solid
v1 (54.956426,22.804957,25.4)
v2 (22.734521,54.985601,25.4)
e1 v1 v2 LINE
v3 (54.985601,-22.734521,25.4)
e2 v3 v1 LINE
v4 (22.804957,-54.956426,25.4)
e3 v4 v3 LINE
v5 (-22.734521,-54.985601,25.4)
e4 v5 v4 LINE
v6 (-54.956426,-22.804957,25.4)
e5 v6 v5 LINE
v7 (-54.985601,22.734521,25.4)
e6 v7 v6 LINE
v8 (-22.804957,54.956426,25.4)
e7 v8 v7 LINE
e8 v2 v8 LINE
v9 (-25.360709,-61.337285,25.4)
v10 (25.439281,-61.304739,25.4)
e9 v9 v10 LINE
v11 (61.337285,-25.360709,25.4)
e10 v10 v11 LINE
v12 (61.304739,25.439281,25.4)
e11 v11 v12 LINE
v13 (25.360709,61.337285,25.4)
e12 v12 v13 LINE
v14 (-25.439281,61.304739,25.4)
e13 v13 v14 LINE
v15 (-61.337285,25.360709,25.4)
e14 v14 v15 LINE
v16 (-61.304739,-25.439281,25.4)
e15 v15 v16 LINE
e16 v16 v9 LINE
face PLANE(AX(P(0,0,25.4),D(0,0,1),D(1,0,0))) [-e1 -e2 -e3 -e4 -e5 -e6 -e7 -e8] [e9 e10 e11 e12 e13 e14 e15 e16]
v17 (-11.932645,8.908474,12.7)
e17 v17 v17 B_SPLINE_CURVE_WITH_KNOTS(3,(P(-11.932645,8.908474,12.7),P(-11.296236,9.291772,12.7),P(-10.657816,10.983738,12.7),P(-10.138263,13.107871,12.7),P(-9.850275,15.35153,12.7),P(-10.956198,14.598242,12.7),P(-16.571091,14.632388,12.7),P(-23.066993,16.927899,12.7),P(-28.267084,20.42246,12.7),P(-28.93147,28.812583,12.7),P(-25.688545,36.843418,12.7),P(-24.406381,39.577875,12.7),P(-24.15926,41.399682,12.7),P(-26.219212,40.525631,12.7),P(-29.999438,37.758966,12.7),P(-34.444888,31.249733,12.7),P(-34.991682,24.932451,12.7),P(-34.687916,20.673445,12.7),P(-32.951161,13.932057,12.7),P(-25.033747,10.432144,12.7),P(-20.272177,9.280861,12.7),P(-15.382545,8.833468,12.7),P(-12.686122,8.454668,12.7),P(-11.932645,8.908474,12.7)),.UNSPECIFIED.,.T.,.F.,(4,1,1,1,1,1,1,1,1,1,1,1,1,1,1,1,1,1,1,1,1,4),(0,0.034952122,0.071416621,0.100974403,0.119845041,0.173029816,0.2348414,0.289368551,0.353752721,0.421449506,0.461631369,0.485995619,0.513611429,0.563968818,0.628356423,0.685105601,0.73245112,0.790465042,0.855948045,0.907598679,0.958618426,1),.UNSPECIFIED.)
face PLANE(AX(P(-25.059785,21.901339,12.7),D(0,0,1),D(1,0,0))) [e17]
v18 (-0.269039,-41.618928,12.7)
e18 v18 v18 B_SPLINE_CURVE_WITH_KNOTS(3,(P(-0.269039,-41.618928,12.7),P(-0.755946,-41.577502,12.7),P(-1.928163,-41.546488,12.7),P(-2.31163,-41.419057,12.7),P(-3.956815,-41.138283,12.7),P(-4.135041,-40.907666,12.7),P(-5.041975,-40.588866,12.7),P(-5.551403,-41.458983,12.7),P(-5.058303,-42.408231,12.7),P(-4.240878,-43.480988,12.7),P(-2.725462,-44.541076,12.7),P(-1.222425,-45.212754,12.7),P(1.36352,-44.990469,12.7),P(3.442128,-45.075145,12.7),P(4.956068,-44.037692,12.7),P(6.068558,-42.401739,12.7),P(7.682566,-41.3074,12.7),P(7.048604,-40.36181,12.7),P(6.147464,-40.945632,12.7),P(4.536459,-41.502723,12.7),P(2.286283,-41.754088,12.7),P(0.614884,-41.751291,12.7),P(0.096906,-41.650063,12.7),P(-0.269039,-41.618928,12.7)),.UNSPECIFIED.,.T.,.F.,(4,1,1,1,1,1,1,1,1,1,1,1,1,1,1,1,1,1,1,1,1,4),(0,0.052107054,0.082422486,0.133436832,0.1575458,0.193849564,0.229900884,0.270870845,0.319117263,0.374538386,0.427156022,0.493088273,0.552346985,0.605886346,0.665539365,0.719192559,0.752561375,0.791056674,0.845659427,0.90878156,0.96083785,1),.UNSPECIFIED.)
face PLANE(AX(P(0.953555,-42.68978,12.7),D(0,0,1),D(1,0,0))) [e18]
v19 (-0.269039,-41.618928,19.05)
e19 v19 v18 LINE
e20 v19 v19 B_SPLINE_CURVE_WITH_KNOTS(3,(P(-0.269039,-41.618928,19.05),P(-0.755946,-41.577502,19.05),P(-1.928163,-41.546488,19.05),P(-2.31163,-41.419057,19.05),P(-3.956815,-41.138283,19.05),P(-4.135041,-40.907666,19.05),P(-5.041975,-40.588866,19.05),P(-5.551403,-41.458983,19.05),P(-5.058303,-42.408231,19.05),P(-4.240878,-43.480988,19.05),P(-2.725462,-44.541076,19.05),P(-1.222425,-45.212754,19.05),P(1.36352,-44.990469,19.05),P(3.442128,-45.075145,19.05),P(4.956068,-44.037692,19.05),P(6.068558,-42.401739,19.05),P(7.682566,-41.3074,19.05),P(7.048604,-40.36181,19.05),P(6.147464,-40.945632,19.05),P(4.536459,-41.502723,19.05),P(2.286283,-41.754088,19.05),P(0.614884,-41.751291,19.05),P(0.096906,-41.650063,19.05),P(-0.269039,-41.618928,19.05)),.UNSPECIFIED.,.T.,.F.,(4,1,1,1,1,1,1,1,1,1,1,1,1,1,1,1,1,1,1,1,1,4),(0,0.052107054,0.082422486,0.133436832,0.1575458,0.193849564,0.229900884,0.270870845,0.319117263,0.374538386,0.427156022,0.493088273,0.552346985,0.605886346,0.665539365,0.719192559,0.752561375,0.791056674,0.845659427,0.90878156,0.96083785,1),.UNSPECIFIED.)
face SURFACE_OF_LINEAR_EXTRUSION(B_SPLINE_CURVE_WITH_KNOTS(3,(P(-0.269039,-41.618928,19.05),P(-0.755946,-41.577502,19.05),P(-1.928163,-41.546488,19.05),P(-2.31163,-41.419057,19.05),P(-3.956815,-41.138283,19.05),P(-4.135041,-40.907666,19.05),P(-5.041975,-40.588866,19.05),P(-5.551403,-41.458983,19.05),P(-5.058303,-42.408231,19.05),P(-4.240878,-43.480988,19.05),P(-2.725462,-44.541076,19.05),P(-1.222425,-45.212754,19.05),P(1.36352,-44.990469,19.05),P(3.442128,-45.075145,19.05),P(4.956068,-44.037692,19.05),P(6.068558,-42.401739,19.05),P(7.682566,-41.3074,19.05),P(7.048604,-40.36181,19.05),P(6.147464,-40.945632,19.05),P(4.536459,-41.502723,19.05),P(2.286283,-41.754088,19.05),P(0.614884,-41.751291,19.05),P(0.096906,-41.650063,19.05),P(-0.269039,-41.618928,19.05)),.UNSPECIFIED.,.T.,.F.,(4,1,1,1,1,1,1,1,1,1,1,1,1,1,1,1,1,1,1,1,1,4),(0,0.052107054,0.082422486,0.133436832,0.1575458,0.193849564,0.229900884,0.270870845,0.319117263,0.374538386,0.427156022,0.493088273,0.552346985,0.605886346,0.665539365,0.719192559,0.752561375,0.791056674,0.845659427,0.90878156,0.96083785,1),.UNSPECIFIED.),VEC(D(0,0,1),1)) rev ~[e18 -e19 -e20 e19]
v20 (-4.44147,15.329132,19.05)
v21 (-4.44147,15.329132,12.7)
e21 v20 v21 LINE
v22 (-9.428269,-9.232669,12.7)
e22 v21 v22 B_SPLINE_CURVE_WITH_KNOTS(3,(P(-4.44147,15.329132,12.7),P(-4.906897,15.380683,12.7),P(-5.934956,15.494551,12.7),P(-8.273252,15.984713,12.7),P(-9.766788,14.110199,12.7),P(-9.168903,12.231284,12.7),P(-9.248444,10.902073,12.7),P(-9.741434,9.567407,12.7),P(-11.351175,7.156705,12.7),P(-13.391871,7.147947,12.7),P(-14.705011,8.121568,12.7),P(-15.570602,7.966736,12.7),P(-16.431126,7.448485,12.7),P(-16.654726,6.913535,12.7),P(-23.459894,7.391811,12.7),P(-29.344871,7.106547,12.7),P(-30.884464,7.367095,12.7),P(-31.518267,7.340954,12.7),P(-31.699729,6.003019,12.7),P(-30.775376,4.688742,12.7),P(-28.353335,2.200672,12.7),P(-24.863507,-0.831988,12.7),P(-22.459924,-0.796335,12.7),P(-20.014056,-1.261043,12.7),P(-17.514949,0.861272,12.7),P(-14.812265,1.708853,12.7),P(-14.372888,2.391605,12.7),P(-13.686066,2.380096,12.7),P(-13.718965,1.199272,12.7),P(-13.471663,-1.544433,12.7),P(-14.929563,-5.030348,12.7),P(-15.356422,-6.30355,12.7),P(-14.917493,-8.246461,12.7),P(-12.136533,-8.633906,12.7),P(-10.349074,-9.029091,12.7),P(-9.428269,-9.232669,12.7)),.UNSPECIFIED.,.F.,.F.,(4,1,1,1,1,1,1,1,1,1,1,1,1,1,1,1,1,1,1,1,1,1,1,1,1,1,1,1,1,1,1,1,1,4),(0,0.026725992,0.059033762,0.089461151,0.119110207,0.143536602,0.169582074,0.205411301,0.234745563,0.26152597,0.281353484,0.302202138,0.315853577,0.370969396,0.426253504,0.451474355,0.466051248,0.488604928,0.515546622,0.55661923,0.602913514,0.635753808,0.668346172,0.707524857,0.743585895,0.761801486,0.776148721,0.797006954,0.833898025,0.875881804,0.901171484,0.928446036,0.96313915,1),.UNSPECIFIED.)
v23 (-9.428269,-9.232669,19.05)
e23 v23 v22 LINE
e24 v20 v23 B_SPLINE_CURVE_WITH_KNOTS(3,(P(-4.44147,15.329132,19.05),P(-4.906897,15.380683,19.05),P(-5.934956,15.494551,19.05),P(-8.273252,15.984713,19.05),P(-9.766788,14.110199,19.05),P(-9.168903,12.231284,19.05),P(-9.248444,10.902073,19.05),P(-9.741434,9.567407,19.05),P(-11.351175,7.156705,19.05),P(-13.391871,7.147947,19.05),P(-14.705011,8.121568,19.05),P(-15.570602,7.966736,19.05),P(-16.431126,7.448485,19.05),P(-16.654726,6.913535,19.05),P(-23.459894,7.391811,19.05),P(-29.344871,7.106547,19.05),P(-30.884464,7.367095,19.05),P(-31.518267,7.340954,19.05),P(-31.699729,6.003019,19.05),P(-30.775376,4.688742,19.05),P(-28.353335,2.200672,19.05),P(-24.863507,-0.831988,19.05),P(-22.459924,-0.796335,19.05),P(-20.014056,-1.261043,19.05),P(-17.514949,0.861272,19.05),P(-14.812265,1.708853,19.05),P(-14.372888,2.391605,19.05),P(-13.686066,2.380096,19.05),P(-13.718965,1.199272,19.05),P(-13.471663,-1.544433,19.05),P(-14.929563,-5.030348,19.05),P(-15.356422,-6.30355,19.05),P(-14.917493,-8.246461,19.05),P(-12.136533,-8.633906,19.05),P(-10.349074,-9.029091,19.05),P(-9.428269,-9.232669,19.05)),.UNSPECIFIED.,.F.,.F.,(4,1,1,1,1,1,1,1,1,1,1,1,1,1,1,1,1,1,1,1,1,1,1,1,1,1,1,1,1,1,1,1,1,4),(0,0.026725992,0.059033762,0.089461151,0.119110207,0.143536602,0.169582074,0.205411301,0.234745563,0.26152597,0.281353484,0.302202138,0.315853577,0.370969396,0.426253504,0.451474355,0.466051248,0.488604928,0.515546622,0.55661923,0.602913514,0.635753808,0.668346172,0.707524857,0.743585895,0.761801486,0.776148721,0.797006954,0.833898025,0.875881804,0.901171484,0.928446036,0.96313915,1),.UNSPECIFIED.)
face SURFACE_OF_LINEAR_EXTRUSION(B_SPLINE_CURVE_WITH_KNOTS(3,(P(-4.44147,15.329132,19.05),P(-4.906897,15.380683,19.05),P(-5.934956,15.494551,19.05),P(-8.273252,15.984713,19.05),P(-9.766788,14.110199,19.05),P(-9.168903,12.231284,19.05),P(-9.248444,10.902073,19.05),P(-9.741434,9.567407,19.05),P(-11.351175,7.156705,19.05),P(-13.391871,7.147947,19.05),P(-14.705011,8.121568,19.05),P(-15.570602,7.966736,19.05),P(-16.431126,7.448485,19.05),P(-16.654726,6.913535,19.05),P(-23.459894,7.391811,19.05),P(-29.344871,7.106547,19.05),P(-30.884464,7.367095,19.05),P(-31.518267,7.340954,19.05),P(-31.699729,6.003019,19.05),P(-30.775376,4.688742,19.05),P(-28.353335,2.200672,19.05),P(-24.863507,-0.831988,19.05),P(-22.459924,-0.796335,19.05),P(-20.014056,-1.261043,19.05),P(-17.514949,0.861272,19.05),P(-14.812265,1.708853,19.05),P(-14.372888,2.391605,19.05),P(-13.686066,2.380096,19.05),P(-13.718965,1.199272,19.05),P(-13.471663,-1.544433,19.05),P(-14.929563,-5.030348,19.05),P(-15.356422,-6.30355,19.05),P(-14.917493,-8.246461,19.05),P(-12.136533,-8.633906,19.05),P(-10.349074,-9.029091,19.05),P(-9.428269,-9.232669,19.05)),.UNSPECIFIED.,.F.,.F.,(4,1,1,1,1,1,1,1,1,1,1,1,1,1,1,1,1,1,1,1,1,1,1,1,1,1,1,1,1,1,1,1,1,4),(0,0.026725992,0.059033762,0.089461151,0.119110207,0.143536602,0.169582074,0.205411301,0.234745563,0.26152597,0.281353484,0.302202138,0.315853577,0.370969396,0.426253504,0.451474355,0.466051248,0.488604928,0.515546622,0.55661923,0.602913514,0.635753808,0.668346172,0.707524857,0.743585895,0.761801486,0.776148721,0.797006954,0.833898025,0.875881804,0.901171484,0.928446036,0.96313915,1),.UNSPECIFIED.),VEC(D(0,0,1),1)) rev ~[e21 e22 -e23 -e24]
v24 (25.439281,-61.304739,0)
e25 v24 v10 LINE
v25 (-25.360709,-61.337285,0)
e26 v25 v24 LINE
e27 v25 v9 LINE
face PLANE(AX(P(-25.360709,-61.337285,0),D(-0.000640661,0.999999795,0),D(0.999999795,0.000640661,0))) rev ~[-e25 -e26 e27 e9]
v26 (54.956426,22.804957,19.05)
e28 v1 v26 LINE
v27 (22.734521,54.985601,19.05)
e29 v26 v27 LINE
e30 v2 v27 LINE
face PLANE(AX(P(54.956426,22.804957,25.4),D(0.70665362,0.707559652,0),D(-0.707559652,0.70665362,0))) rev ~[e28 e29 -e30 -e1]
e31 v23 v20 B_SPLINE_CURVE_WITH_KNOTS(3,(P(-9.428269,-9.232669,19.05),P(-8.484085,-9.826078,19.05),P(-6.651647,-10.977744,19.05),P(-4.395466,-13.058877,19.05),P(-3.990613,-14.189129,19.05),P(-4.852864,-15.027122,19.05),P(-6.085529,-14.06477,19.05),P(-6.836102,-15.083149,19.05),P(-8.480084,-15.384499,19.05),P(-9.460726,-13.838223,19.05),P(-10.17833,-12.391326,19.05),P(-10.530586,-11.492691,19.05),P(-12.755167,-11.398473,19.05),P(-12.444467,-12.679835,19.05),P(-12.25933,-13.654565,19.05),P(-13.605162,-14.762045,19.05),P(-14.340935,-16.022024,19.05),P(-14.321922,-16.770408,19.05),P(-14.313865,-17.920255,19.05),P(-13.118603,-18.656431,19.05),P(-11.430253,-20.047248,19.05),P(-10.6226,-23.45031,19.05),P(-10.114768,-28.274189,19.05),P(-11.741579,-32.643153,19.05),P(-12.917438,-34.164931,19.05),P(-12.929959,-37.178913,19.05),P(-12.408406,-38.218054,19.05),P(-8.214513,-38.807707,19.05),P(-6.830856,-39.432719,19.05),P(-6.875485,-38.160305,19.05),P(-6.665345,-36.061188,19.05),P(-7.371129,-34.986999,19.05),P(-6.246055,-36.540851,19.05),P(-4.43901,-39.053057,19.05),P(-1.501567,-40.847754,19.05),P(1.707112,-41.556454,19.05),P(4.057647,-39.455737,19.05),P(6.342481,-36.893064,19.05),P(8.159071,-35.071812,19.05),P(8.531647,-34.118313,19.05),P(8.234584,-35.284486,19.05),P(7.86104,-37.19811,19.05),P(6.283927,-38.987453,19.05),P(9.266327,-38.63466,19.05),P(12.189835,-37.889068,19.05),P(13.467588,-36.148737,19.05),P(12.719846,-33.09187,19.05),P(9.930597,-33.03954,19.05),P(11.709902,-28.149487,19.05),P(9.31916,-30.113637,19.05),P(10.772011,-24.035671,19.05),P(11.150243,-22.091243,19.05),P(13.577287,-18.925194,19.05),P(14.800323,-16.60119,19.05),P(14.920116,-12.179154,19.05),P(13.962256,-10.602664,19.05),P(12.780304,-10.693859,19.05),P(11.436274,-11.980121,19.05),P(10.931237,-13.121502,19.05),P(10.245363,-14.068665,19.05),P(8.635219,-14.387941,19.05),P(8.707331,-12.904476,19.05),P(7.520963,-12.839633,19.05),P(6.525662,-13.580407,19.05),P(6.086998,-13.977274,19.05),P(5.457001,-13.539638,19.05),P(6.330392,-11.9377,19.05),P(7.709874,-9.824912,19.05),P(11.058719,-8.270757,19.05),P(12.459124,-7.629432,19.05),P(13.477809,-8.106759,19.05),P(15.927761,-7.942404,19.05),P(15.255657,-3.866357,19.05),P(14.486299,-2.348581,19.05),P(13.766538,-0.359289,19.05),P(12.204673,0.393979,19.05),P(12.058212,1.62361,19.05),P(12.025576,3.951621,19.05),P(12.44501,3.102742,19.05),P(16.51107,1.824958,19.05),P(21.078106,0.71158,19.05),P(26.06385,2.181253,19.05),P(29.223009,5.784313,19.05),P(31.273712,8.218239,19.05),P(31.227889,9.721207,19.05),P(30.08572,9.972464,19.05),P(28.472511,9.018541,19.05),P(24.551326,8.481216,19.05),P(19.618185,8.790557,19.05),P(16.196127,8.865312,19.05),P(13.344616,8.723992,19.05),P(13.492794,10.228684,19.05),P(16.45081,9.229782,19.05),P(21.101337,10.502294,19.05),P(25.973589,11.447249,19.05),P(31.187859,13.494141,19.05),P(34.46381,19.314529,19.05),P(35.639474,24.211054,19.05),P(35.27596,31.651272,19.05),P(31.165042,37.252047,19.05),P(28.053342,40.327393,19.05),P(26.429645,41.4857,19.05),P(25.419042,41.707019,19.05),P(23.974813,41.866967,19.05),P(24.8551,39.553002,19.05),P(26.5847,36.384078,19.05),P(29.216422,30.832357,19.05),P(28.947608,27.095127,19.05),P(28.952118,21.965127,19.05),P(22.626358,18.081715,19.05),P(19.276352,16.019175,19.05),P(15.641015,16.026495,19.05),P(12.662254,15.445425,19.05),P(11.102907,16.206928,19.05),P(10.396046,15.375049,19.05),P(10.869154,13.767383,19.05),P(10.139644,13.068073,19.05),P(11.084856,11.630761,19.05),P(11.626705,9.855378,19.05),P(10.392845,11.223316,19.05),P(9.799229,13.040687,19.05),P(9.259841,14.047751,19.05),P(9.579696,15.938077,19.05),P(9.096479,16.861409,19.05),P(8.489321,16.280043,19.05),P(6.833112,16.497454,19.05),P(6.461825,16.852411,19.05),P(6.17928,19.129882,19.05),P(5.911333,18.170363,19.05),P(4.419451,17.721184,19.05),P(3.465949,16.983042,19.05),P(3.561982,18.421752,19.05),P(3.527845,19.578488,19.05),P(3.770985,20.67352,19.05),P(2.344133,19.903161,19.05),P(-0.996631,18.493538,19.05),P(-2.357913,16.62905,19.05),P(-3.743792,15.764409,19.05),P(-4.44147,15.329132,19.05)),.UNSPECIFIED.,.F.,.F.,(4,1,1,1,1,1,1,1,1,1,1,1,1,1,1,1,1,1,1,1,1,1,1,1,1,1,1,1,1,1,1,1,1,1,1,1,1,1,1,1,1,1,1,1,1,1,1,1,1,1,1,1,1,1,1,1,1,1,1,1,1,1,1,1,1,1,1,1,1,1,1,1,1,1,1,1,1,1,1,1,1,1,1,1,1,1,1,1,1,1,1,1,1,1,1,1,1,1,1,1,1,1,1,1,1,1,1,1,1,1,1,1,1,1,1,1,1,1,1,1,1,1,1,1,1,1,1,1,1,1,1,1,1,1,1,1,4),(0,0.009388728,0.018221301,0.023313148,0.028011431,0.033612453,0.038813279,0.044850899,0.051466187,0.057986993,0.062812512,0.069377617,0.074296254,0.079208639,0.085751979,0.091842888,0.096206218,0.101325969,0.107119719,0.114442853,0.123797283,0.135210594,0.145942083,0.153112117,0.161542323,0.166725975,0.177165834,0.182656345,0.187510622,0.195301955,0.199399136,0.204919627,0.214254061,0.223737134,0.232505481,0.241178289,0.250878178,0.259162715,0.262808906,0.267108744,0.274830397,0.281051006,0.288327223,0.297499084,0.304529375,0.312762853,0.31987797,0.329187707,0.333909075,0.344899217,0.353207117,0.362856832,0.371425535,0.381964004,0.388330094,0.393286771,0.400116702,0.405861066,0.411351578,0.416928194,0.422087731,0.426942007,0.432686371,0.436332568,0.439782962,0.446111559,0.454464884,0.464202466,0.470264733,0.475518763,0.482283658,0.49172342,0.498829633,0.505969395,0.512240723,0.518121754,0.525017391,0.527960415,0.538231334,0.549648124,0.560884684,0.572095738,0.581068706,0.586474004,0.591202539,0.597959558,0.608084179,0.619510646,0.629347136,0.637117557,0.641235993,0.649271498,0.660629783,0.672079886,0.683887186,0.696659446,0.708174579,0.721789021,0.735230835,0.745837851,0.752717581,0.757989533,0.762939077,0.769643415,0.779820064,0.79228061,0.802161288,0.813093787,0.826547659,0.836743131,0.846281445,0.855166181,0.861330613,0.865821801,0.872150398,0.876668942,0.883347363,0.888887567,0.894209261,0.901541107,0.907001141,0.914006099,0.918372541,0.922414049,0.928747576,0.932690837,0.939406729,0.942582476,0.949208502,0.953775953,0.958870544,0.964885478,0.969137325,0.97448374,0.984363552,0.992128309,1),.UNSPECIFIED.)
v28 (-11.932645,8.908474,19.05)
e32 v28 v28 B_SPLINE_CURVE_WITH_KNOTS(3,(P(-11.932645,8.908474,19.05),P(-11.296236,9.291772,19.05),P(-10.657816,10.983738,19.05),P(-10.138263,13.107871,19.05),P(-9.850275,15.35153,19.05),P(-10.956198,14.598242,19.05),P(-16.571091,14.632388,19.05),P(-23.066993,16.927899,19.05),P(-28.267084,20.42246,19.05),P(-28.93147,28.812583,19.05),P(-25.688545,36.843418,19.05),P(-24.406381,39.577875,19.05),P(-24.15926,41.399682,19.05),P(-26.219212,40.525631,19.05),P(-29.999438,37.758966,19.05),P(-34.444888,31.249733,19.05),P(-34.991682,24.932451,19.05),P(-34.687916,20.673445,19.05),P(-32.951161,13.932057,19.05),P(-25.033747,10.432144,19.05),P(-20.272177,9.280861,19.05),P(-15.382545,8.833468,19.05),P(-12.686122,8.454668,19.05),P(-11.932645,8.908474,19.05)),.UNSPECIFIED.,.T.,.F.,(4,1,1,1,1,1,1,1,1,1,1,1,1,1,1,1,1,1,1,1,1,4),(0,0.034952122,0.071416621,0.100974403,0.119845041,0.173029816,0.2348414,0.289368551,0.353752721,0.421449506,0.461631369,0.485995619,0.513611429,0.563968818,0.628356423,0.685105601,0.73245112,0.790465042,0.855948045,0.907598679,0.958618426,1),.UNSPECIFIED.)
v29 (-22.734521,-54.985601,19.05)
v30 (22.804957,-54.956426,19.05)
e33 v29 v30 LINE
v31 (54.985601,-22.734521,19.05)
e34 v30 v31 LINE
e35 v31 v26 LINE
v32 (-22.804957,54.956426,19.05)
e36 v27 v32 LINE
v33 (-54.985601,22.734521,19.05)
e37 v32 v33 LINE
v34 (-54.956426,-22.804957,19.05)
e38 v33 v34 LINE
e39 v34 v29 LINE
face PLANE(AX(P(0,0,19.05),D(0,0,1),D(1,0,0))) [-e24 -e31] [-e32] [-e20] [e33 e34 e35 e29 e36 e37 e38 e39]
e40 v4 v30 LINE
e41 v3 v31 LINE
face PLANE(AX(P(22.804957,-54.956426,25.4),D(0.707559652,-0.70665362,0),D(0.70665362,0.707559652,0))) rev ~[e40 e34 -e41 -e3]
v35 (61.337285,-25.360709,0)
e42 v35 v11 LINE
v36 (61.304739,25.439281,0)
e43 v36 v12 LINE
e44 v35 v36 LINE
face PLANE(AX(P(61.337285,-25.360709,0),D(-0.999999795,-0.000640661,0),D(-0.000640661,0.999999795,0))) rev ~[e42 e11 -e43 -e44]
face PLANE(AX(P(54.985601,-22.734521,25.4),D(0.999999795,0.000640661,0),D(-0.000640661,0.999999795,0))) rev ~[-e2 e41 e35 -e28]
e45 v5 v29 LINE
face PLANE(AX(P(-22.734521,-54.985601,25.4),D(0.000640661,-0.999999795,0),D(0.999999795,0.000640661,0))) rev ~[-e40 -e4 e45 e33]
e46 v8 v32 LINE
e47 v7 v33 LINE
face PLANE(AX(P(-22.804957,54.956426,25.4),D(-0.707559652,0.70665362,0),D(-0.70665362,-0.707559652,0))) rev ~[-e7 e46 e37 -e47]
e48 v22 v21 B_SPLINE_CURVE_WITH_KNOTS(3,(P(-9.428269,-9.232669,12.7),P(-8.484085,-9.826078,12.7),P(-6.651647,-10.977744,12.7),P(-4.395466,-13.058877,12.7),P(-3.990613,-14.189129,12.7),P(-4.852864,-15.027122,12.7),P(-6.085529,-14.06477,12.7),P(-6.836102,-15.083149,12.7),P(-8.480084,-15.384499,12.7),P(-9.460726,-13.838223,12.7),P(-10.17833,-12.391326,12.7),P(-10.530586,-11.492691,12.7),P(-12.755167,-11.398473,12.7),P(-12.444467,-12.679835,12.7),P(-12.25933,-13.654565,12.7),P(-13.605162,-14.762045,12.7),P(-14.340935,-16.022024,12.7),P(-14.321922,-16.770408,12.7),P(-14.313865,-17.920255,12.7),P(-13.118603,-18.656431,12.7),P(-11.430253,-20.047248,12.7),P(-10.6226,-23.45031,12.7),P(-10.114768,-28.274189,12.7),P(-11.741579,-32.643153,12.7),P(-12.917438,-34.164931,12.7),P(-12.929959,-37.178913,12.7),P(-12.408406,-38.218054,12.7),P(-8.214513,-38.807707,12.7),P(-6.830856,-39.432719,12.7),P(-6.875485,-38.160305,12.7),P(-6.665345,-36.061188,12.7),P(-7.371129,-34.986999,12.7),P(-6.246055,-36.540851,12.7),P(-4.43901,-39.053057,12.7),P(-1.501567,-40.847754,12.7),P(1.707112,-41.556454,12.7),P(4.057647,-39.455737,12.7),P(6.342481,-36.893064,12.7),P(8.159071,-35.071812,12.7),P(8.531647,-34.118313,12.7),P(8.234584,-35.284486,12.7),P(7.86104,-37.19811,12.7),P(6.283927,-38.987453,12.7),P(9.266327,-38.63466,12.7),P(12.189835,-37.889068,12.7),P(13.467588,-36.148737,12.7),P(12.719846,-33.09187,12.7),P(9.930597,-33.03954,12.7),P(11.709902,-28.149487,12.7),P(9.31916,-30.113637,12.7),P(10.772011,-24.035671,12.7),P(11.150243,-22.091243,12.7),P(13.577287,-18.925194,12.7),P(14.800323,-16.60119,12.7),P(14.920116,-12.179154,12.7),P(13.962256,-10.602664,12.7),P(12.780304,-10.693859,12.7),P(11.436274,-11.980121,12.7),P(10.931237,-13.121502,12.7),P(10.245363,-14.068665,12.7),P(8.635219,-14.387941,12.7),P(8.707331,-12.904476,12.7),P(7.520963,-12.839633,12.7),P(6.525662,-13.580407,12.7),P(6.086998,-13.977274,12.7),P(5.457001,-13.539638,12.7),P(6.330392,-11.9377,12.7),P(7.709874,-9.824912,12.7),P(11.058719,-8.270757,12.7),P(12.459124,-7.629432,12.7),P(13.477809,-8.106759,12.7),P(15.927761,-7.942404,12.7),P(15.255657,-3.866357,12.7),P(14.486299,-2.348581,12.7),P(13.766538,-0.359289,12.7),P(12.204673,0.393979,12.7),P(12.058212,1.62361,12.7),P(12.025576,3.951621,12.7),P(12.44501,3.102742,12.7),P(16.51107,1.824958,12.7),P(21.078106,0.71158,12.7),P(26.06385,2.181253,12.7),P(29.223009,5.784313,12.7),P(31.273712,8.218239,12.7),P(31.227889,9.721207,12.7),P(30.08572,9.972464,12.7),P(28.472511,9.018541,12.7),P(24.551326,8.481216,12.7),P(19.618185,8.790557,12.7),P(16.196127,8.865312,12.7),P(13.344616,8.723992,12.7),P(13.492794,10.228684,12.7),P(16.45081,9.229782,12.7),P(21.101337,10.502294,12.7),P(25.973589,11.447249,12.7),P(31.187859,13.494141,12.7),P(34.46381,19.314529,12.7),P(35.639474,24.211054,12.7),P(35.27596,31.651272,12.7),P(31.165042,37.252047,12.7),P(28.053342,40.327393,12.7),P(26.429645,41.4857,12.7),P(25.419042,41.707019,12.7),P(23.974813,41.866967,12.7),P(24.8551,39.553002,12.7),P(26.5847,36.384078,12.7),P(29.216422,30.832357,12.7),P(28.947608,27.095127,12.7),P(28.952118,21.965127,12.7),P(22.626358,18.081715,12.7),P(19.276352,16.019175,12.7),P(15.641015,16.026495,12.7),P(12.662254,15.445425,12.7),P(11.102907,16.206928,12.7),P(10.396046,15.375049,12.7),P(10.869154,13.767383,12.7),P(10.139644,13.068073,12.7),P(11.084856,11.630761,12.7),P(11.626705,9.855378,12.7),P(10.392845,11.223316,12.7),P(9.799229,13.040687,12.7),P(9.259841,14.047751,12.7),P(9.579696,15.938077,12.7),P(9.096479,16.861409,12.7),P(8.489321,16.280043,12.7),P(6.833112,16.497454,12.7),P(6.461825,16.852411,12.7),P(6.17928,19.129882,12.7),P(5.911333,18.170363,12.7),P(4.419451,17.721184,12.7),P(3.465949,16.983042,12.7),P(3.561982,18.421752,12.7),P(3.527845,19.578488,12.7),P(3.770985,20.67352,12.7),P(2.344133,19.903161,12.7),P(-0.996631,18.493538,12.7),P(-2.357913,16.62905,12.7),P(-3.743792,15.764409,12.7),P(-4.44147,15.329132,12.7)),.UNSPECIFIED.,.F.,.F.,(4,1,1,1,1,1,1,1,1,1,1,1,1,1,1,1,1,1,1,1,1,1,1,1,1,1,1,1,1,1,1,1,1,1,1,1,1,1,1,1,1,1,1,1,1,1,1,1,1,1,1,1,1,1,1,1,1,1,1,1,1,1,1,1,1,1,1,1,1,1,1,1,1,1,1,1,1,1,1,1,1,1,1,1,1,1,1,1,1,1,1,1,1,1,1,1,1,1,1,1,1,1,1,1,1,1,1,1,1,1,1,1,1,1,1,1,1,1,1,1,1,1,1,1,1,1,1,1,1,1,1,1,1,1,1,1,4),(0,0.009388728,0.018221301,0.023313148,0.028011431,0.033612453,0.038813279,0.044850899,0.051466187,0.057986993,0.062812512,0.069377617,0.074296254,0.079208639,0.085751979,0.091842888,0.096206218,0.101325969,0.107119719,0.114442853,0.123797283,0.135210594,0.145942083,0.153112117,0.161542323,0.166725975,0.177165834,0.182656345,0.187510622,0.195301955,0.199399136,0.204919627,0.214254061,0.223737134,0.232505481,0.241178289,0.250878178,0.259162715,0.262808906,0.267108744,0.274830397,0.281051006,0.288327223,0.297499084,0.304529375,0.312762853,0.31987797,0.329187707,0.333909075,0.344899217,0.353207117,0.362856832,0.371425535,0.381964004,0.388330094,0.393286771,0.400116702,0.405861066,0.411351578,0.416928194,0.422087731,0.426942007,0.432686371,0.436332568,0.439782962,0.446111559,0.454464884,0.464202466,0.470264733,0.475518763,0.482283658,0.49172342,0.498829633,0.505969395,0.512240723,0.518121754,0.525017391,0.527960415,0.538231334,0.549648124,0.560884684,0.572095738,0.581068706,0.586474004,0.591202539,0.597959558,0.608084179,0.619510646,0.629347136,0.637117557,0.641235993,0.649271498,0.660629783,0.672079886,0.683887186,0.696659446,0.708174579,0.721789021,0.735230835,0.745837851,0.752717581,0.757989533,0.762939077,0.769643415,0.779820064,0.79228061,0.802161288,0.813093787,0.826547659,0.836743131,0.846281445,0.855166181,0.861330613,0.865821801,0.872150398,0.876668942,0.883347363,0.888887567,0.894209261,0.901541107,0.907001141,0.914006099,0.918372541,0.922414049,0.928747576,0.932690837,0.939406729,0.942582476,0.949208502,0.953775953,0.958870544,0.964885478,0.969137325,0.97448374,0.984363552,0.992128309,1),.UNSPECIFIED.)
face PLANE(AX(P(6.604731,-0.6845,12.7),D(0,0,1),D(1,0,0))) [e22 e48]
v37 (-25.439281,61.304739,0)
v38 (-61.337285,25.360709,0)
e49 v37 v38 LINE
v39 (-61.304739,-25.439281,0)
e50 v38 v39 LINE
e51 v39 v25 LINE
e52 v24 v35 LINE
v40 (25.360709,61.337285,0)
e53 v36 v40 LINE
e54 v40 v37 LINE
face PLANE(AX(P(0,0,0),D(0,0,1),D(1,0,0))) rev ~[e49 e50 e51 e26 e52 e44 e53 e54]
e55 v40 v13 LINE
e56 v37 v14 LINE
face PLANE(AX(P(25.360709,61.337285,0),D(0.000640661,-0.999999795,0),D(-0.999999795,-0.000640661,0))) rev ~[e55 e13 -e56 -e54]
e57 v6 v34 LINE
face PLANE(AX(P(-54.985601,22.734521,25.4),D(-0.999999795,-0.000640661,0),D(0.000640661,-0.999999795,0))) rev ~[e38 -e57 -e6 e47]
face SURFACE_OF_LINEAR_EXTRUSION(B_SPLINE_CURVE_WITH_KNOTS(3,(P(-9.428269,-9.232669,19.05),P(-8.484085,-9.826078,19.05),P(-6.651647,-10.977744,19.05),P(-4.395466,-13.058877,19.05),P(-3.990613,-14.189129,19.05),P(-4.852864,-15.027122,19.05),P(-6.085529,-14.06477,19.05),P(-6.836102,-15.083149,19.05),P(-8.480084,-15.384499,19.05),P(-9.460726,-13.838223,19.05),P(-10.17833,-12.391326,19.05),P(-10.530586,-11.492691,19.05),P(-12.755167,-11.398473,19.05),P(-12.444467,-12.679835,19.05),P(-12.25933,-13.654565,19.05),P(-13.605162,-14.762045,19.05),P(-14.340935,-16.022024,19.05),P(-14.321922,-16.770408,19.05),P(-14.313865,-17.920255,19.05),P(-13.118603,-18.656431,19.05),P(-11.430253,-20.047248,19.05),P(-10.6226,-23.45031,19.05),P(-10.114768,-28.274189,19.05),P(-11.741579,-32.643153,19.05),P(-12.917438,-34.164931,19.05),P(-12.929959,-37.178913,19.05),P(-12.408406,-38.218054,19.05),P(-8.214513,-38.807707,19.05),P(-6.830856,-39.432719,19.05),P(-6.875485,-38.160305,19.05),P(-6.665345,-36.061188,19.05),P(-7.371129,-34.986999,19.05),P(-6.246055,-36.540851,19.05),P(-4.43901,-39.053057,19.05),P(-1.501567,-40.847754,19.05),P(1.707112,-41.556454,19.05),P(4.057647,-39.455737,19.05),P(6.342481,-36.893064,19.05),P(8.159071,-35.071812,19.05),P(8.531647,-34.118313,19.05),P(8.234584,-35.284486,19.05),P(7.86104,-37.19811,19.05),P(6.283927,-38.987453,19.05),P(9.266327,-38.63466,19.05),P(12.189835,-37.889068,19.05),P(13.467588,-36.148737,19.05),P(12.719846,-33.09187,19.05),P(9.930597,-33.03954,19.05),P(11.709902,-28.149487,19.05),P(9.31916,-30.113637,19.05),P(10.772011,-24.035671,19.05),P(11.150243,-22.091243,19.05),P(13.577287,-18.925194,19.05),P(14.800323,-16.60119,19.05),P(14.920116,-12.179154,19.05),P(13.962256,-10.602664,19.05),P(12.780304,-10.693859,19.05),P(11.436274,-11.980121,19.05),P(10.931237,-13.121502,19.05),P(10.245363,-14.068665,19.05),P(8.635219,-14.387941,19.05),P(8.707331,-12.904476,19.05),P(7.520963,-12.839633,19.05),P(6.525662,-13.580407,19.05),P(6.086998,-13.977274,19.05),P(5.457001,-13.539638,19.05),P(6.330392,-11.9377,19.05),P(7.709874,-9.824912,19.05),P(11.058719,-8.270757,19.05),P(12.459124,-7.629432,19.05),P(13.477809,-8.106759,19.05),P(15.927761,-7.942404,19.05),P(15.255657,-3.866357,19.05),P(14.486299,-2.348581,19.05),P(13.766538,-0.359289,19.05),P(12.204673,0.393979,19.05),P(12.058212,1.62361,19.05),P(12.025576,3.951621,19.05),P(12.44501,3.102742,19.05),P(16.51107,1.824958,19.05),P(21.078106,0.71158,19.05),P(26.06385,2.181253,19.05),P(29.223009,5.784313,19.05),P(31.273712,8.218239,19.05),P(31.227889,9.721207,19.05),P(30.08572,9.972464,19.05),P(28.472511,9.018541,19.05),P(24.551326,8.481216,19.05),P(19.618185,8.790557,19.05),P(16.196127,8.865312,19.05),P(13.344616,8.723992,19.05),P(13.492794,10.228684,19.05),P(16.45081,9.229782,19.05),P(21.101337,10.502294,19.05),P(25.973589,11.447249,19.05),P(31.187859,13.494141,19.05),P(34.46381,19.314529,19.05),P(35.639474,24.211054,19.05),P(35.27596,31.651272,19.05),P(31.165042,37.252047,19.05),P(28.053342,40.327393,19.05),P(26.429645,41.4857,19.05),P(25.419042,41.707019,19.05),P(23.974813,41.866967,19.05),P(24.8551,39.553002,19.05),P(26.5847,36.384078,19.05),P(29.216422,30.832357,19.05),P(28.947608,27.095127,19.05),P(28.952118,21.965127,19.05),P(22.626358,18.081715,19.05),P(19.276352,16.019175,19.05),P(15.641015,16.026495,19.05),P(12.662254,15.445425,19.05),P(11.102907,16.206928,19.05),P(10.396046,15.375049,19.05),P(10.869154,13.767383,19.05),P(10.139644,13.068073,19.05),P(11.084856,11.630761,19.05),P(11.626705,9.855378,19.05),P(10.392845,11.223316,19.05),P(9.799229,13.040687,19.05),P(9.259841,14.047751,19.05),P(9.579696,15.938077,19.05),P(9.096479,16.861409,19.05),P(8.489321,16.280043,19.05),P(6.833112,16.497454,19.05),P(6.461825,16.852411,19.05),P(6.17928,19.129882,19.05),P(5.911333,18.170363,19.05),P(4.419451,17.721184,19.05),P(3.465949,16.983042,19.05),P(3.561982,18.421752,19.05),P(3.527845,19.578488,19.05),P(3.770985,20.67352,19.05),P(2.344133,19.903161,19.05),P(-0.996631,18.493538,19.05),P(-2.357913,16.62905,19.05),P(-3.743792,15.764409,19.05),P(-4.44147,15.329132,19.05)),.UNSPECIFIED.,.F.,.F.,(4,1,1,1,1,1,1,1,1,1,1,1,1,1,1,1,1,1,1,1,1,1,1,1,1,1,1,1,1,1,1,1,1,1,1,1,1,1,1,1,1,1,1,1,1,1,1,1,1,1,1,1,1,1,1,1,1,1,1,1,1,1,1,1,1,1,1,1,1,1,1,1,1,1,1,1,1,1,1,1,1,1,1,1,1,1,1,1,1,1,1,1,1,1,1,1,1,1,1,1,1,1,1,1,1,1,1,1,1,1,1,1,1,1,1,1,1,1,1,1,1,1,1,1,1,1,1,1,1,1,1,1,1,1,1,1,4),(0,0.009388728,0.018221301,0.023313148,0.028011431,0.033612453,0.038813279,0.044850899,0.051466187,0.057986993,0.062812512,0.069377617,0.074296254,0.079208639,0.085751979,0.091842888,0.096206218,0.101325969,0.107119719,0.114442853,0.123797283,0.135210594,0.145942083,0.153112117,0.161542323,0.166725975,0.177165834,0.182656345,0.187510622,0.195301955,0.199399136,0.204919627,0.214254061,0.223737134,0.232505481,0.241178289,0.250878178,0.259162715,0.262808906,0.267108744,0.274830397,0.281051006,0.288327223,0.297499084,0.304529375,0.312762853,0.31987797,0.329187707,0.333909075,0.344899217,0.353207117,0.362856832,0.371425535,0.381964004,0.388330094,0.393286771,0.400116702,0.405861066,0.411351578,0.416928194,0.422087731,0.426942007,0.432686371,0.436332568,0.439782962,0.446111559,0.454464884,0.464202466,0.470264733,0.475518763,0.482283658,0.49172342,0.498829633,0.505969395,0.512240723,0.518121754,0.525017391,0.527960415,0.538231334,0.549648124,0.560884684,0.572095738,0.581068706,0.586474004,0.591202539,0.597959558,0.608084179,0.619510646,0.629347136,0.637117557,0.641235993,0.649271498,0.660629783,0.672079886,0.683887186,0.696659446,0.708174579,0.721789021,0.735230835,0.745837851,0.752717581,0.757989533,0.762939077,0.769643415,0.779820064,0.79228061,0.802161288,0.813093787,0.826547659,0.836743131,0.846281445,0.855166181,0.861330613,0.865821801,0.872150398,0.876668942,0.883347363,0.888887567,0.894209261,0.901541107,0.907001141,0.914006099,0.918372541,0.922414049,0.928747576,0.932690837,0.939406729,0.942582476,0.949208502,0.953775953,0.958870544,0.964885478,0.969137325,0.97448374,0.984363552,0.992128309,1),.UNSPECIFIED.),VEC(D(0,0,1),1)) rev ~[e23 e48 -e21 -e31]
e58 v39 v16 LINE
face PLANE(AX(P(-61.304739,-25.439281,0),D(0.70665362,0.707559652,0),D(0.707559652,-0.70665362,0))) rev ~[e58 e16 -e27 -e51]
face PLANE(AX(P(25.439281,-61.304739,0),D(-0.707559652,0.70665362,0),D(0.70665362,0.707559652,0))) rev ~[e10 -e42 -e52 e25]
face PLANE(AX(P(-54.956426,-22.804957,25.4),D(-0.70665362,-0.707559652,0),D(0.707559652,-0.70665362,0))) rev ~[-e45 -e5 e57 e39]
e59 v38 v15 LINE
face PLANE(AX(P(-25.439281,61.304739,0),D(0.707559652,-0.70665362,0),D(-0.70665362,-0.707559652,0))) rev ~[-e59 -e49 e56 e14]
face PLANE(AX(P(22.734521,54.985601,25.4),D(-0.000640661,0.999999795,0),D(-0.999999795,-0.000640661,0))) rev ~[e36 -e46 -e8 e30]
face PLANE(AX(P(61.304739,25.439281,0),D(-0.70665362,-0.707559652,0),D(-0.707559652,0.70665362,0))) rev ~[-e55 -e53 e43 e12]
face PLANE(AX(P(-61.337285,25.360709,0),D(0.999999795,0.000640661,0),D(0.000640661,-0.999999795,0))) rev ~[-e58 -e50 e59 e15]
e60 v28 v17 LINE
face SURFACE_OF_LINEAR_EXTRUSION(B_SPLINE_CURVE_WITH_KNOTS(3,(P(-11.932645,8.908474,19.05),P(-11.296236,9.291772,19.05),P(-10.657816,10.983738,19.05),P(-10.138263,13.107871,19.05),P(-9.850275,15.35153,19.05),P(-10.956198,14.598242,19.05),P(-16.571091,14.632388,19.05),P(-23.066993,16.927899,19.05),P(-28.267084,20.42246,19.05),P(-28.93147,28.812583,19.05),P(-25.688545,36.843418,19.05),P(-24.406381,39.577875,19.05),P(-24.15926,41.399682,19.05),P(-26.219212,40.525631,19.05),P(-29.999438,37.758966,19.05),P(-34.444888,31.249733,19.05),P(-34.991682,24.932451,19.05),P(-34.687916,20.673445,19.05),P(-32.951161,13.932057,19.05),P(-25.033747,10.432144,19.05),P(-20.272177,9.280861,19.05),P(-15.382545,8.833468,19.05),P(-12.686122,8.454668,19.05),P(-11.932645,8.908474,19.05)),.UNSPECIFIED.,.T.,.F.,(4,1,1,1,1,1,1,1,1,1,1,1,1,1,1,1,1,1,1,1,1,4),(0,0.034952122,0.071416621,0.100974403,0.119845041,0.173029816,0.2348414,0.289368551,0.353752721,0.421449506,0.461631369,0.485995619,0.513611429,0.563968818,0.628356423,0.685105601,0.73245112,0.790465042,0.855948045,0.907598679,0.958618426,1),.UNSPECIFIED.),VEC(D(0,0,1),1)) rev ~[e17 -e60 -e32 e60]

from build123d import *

# Parameters (mm, degrees)
F1_DEPTH = 25.4
F3_DEPTH = 6.35
F5_DEPTH = 6.35


with BuildPart() as f1:
    # F0 (on Top) → F1 (new body)
    with BuildSketch(Plane.XY):
        Polygon((-61.3372846899, 25.3607087968), (-61.3047391097, -25.4392807779), (-25.3607087968, -61.3372846899), (25.4392807779, -61.3047391097), (61.3372846899, -25.3607087968), (61.3047391097, 25.4392807779), (25.3607087968, 61.3372846899), (-25.4392807779, 61.3047391097), align=None)
    extrude(amount=F1_DEPTH)

    # F2 (on face) → F3 (cut)
    with BuildSketch(Plane.XY.offset(25.4)):
        Polygon((-54.9856008905, 22.734521413), (-54.9564255154, -22.8049569991), (-22.734521413, -54.9856008905), (22.8049569991, -54.9564255154), (54.9856008905, -22.734521413), (54.9564255154, 22.8049569991), (22.734521413, 54.9856008905), (-22.8049569991, 54.9564255154), align=None)
    extrude(amount=-F3_DEPTH, mode=Mode.SUBTRACT)

    # F4 (on face) → F5 (cut)
    with BuildSketch(Plane.XY.offset(19.05)):
        with BuildLine():
            add(Edge.make_bspline(
                [(-9.4282692298, -9.2326691374), (-8.4840850857, -9.8260777562), (-6.6516469636, -10.9777435428), (-4.395465984, -13.058877404), (-3.9906127923, -14.1891294159), (-4.8528640078, -15.0271217271), (-6.0855293908, -14.0647696181), (-6.8361021294, -15.0831488918), (-8.4800836888, -15.3844987998), (-9.4607258976, -13.8382234216), (-10.1783295199, -12.39132644), (-10.530585818, -11.4926907531), (-12.7551665659, -11.3984729667), (-12.4444668271, -12.6798354478), (-12.2593299659, -13.6545652797), (-13.6051622467, -14.7620446933), (-14.3409348224, -16.0220239486), (-14.321922051, -16.7704078365), (-14.3138650061, -17.9202545143), (-13.1186034777, -18.6564307431), (-11.4302528187, -20.0472476584), (-10.6225997404, -23.450310294), (-10.1147680829, -28.2741892714), (-11.7415790253, -32.6431531794), (-12.9174382916, -34.1649309464), (-12.9299587644, -37.178912773), (-12.4084055803, -38.2180544166), (-8.2145131464, -38.8077069126), (-6.8308559522, -39.4327185107), (-6.875484581, -38.16030542), (-6.6653450214, -36.0611878603), (-7.371128777, -34.9869994652), (-6.2460552937, -36.5408514888), (-4.4390102983, -39.0530569173), (-1.5015671125, -40.8477543068), (1.7071115917, -41.5564539503), (4.0576467306, -39.4557372162), (6.3424814353, -36.8930641139), (8.1590712868, -35.071811946), (8.5316472223, -34.1183133667), (8.2345836672, -35.2844855117), (7.8610398012, -37.1981099423), (6.2839273245, -38.9874526439), (9.266326691, -38.6346600876), (12.189835357, -37.8890680945), (13.4675883573, -36.1487373368), (12.7198460699, -33.0918695437), (9.930596948, -33.0395399652), (11.7099019289, -28.1494867023), (9.3191604838, -30.1136369501), (10.7720113651, -24.0356712037), (11.150243095, -22.091243294), (13.5772865075, -18.9251935606), (14.8003233954, -16.6011904572), (14.9201164538, -12.1791536076), (13.9622562681, -10.6026640562), (12.7803035011, -10.6938590154), (11.4362744481, -11.9801209333), (10.9312367978, -13.1215024658), (10.2453634757, -14.0686647647), (8.6352191248, -14.3879407439), (8.7073308617, -12.9044764652), (7.5209627677, -12.8396326003), (6.5256616405, -13.580406599), (6.0869976466, -13.9772738505), (5.4570005301, -13.5396377785), (6.3303917881, -11.9377003518), (7.7098741158, -9.8249117821), (11.0587187123, -8.2707570297), (12.4591243746, -7.6294322877), (13.4778087168, -8.1067590986), (15.9277607605, -7.9424041277), (15.2556568662, -3.8663568868), (14.4862990975, -2.3485813704), (13.7665382129, -0.3592892165), (12.2046730698, 0.3939785277), (12.0582121105, 1.6236098482), (12.0255761857, 3.9516208247), (12.4450103136, 3.1027423912), (16.5110699597, 1.8249579504), (21.078106057, 0.7115795625), (26.0638495162, 2.1812531443), (29.2230087502, 5.7843129757), (31.2737116624, 8.2182389542), (31.2278889418, 9.721207294), (30.0857203595, 9.9724642069), (28.472510997, 9.0185412307), (24.5513264234, 8.481216416), (19.6181854574, 8.7905574192), (16.196127468, 8.8653123167), (13.3446161645, 8.723991591), (13.4927937008, 10.2286844933), (16.4508103427, 9.2297816698), (21.1013365186, 10.502293822), (25.9735893436, 11.4472493706), (31.1878588966, 13.4941405465), (34.4638101564, 19.3145293919), (35.6394736154, 24.2110537108), (35.275960363, 31.6512720663), (31.1650423262, 37.2520467873), (28.0533420692, 40.3273925181), (26.4296452657, 41.485700122), (25.4190416812, 41.7070187418), (23.9748134483, 41.8669669932), (24.8551004672, 39.5530018645), (26.5847000727, 36.3840778799), (29.2164222614, 30.8323567036), (28.9476077056, 27.0951272934), (28.9521176027, 21.9651272091), (22.6263582287, 18.0817154192), (19.2763516356, 16.019175046), (15.6410149746, 16.0264947024), (12.6622540075, 15.4454248136), (11.1029074367, 16.2069281425), (10.3960461713, 15.3750494473), (10.8691535509, 13.7673825709), (10.1396442285, 13.0680734148), (11.0848560208, 11.6307606922), (11.6267048162, 9.8553781089), (10.3928447984, 11.2233156131), (9.7992288744, 13.040687065), (9.2598412935, 14.0477513552), (9.579696114, 15.9380770854), (9.0964793415, 16.8614094225), (8.4893205371, 16.2800428745), (6.8331120922, 16.4974540301), (6.4618248238, 16.8524107039), (6.1792797507, 19.1298816215), (5.9113327868, 18.1703634489), (4.4194509507, 17.7211838272), (3.4659487949, 16.9830424479), (3.5619819446, 18.4217518194), (3.5278446131, 19.5784882166), (3.7709848691, 20.6735203119), (2.3441332322, 19.9031610038), (-0.9966306201, 18.4935375741), (-2.3579134542, 16.6290500898), (-3.7437918395, 15.7644089715), (-4.4414699078, 15.3291318566)],
                knots=[0, 0, 0, 0, 0.0093887284, 0.0182213014, 0.0233131476, 0.0280114315, 0.0336124529, 0.0388132789, 0.0448508987, 0.0514661867, 0.0579869925, 0.0628125121, 0.0693776173, 0.0742962539, 0.0792086391, 0.0857519788, 0.0918428882, 0.096206218, 0.1013259694, 0.1071197189, 0.1144428534, 0.1237972835, 0.1352105935, 0.1459420833, 0.1531121172, 0.1615423232, 0.166725975, 0.1771658341, 0.1826563447, 0.1875106221, 0.1953019551, 0.1993991365, 0.2049196268, 0.2142540612, 0.2237371342, 0.2325054811, 0.2411782885, 0.2508781783, 0.2591627147, 0.2628089063, 0.2671087438, 0.2748303973, 0.2810510059, 0.288327223, 0.2974990844, 0.3045293751, 0.3127628534, 0.3198779695, 0.3291877075, 0.3339090751, 0.344899217, 0.3532071168, 0.3628568316, 0.371425535, 0.3819640039, 0.3883300936, 0.3932867711, 0.400116702, 0.405861066, 0.4113515785, 0.4169281938, 0.4220877311, 0.4269420071, 0.4326863712, 0.4363325684, 0.4397829616, 0.4461115588, 0.4544648842, 0.4642024659, 0.4702647327, 0.475518763, 0.4822836579, 0.4917234199, 0.4988296333, 0.5059693952, 0.5122407232, 0.5181217541, 0.5250173913, 0.5279604155, 0.5382313342, 0.5496481242, 0.5608846845, 0.5720957385, 0.5810687061, 0.5864740039, 0.5912025392, 0.597959558, 0.6080841791, 0.6195106459, 0.6293471359, 0.6371175574, 0.6412359933, 0.6492714977, 0.6606297825, 0.672079886, 0.6838871859, 0.6966594462, 0.7081745795, 0.7217890209, 0.7352308346, 0.7458378514, 0.752717581, 0.7579895334, 0.7629390765, 0.7696434146, 0.7798200645, 0.7922806096, 0.8021612881, 0.8130937866, 0.8265476592, 0.8367431308, 0.8462814452, 0.8551661805, 0.8613306134, 0.8658218009, 0.8721503975, 0.8766689416, 0.8833473635, 0.8888875665, 0.8942092607, 0.9015411068, 0.9070011411, 0.9140060991, 0.9183725406, 0.9224140492, 0.928747576, 0.932690837, 0.9394067292, 0.9425824756, 0.9492085016, 0.9537759532, 0.9588705435, 0.9648854784, 0.9691373246, 0.9744837396, 0.9843635518, 0.9921283086, 1, 1, 1, 1], degree=3))
            add(Edge.make_bspline(
                [(-4.4414699078, 15.3291318566), (-4.9068967225, 15.3806827308), (-5.9349556814, 15.4945509834), (-8.2732521375, 15.9847129393), (-9.7667880134, 14.1101988204), (-9.168903392, 12.2312839638), (-9.2484442212, 10.9020733102), (-9.7414335487, 9.5674071396), (-11.3511745418, 7.1567049444), (-13.3918709559, 7.1479473791), (-14.7050111685, 8.1215683651), (-15.5706019088, 7.9667355563), (-16.4311261821, 7.4484853366), (-16.6547257887, 6.9135346109), (-23.4598936578, 7.3918112186), (-29.3448714402, 7.1065466932), (-30.8844644754, 7.3670952023), (-31.5182667154, 7.3409536777), (-31.6997293932, 6.0030194205), (-30.7753763437, 4.6887419911), (-28.3533346738, 2.2006722005), (-24.863507439, -0.8319883365), (-22.4599240989, -0.7963354442), (-20.0140560821, -1.2610430772), (-17.5149487875, 0.8612721058), (-14.8122648285, 1.7088528475), (-14.3728875457, 2.3916052687), (-13.6860658167, 2.380095861), (-13.7189647119, 1.1992723358), (-13.4716632298, -1.5444326183), (-14.9295629485, -5.0303479787), (-15.3564223079, -6.3035501228), (-14.9174930287, -8.246461194), (-12.1365329972, -8.6339063958), (-10.3490742469, -9.0290908364), (-9.4282692298, -9.2326691374)],
                knots=[0, 0, 0, 0, 0.0267259922, 0.0590337618, 0.089461151, 0.1191102068, 0.1435366022, 0.1695820738, 0.2054113012, 0.2347455632, 0.26152597, 0.2813534837, 0.3022021384, 0.3158535767, 0.3709693963, 0.4262535041, 0.4514743551, 0.4660512479, 0.4886049281, 0.5155466217, 0.5566192303, 0.6029135136, 0.6357538083, 0.6683461724, 0.707524857, 0.7435858948, 0.7618014862, 0.7761487209, 0.797006954, 0.8338980252, 0.8758818035, 0.9011714843, 0.9284460361, 0.9631391499, 1, 1, 1, 1], degree=3))
        make_face()
        with BuildLine():
            add(Edge.make_bspline(
                [(-11.9326449931, 8.9084738865), (-11.2962358524, 9.2917720985), (-10.6578160321, 10.9837375729), (-10.1382627959, 13.1078709144), (-9.8502745998, 15.3515303356), (-10.9561982877, 14.5982416136), (-16.5710905244, 14.6323876627), (-23.0669928768, 16.9278992666), (-28.2670840419, 20.4224602133), (-28.9314703073, 28.8125825553), (-25.688544588, 36.8434179775), (-24.4063809769, 39.5778752869), (-24.1592604868, 41.3996816674), (-26.2192121955, 40.5256312351), (-29.9994381949, 37.7589660174), (-34.444888146, 31.2497328496), (-34.9916822779, 24.9324513831), (-34.6879161063, 20.6734445245), (-32.9511608041, 13.932057372), (-25.0337467243, 10.432144423), (-20.2721765186, 9.2808612838), (-15.3825447297, 8.8334678412), (-12.6861217586, 8.4546678701), (-11.9326449931, 8.9084738865)],
                knots=[0, 0, 0, 0, 0.034952122, 0.0714166213, 0.100974403, 0.119845041, 0.1730298163, 0.2348413997, 0.2893685511, 0.3537527211, 0.4214495061, 0.4616313691, 0.4859956187, 0.5136114288, 0.563968818, 0.6283564226, 0.6851056009, 0.73245112, 0.7904650419, 0.8559480448, 0.9075986795, 0.9586184262, 1, 1, 1, 1], degree=3))
        make_face()
        with BuildLine():
            add(Edge.make_bspline(
                [(-0.2690389229, -41.6189283133), (-0.7559459853, -41.5775023038), (-1.9281628917, -41.5464883275), (-2.3116298552, -41.4190567236), (-3.956815349, -41.138282935), (-4.1350406366, -40.9076661362), (-5.041975201, -40.5888659914), (-5.5514031699, -41.4589829371), (-5.0583032619, -42.4082313776), (-4.2408784433, -43.4809876579), (-2.7254620157, -44.541075909), (-1.2224251251, -45.2127540621), (1.3635198147, -44.9904689233), (3.442127916, -45.0751445846), (4.9560675398, -44.0376916587), (6.0685582276, -42.4017388875), (7.6825662355, -41.3073998624), (7.0486044467, -40.3618100068), (6.1474640448, -40.9456318446), (4.5364587935, -41.5027229801), (2.2862829045, -41.754088392), (0.6148836095, -41.75129053), (0.0969062968, -41.6500628999), (-0.2690389229, -41.6189283133)],
                knots=[0, 0, 0, 0, 0.0521070544, 0.0824224864, 0.1334368321, 0.1575458, 0.1938495641, 0.229900884, 0.2708708446, 0.3191172634, 0.3745383858, 0.4271560219, 0.4930882729, 0.5523469847, 0.6058863464, 0.6655393651, 0.7191925586, 0.7525613754, 0.7910566744, 0.8456594271, 0.9087815599, 0.9608378499, 1, 1, 1, 1], degree=3))
        make_face()
    extrude(amount=-F5_DEPTH, mode=Mode.SUBTRACT)


solid = f1.part
